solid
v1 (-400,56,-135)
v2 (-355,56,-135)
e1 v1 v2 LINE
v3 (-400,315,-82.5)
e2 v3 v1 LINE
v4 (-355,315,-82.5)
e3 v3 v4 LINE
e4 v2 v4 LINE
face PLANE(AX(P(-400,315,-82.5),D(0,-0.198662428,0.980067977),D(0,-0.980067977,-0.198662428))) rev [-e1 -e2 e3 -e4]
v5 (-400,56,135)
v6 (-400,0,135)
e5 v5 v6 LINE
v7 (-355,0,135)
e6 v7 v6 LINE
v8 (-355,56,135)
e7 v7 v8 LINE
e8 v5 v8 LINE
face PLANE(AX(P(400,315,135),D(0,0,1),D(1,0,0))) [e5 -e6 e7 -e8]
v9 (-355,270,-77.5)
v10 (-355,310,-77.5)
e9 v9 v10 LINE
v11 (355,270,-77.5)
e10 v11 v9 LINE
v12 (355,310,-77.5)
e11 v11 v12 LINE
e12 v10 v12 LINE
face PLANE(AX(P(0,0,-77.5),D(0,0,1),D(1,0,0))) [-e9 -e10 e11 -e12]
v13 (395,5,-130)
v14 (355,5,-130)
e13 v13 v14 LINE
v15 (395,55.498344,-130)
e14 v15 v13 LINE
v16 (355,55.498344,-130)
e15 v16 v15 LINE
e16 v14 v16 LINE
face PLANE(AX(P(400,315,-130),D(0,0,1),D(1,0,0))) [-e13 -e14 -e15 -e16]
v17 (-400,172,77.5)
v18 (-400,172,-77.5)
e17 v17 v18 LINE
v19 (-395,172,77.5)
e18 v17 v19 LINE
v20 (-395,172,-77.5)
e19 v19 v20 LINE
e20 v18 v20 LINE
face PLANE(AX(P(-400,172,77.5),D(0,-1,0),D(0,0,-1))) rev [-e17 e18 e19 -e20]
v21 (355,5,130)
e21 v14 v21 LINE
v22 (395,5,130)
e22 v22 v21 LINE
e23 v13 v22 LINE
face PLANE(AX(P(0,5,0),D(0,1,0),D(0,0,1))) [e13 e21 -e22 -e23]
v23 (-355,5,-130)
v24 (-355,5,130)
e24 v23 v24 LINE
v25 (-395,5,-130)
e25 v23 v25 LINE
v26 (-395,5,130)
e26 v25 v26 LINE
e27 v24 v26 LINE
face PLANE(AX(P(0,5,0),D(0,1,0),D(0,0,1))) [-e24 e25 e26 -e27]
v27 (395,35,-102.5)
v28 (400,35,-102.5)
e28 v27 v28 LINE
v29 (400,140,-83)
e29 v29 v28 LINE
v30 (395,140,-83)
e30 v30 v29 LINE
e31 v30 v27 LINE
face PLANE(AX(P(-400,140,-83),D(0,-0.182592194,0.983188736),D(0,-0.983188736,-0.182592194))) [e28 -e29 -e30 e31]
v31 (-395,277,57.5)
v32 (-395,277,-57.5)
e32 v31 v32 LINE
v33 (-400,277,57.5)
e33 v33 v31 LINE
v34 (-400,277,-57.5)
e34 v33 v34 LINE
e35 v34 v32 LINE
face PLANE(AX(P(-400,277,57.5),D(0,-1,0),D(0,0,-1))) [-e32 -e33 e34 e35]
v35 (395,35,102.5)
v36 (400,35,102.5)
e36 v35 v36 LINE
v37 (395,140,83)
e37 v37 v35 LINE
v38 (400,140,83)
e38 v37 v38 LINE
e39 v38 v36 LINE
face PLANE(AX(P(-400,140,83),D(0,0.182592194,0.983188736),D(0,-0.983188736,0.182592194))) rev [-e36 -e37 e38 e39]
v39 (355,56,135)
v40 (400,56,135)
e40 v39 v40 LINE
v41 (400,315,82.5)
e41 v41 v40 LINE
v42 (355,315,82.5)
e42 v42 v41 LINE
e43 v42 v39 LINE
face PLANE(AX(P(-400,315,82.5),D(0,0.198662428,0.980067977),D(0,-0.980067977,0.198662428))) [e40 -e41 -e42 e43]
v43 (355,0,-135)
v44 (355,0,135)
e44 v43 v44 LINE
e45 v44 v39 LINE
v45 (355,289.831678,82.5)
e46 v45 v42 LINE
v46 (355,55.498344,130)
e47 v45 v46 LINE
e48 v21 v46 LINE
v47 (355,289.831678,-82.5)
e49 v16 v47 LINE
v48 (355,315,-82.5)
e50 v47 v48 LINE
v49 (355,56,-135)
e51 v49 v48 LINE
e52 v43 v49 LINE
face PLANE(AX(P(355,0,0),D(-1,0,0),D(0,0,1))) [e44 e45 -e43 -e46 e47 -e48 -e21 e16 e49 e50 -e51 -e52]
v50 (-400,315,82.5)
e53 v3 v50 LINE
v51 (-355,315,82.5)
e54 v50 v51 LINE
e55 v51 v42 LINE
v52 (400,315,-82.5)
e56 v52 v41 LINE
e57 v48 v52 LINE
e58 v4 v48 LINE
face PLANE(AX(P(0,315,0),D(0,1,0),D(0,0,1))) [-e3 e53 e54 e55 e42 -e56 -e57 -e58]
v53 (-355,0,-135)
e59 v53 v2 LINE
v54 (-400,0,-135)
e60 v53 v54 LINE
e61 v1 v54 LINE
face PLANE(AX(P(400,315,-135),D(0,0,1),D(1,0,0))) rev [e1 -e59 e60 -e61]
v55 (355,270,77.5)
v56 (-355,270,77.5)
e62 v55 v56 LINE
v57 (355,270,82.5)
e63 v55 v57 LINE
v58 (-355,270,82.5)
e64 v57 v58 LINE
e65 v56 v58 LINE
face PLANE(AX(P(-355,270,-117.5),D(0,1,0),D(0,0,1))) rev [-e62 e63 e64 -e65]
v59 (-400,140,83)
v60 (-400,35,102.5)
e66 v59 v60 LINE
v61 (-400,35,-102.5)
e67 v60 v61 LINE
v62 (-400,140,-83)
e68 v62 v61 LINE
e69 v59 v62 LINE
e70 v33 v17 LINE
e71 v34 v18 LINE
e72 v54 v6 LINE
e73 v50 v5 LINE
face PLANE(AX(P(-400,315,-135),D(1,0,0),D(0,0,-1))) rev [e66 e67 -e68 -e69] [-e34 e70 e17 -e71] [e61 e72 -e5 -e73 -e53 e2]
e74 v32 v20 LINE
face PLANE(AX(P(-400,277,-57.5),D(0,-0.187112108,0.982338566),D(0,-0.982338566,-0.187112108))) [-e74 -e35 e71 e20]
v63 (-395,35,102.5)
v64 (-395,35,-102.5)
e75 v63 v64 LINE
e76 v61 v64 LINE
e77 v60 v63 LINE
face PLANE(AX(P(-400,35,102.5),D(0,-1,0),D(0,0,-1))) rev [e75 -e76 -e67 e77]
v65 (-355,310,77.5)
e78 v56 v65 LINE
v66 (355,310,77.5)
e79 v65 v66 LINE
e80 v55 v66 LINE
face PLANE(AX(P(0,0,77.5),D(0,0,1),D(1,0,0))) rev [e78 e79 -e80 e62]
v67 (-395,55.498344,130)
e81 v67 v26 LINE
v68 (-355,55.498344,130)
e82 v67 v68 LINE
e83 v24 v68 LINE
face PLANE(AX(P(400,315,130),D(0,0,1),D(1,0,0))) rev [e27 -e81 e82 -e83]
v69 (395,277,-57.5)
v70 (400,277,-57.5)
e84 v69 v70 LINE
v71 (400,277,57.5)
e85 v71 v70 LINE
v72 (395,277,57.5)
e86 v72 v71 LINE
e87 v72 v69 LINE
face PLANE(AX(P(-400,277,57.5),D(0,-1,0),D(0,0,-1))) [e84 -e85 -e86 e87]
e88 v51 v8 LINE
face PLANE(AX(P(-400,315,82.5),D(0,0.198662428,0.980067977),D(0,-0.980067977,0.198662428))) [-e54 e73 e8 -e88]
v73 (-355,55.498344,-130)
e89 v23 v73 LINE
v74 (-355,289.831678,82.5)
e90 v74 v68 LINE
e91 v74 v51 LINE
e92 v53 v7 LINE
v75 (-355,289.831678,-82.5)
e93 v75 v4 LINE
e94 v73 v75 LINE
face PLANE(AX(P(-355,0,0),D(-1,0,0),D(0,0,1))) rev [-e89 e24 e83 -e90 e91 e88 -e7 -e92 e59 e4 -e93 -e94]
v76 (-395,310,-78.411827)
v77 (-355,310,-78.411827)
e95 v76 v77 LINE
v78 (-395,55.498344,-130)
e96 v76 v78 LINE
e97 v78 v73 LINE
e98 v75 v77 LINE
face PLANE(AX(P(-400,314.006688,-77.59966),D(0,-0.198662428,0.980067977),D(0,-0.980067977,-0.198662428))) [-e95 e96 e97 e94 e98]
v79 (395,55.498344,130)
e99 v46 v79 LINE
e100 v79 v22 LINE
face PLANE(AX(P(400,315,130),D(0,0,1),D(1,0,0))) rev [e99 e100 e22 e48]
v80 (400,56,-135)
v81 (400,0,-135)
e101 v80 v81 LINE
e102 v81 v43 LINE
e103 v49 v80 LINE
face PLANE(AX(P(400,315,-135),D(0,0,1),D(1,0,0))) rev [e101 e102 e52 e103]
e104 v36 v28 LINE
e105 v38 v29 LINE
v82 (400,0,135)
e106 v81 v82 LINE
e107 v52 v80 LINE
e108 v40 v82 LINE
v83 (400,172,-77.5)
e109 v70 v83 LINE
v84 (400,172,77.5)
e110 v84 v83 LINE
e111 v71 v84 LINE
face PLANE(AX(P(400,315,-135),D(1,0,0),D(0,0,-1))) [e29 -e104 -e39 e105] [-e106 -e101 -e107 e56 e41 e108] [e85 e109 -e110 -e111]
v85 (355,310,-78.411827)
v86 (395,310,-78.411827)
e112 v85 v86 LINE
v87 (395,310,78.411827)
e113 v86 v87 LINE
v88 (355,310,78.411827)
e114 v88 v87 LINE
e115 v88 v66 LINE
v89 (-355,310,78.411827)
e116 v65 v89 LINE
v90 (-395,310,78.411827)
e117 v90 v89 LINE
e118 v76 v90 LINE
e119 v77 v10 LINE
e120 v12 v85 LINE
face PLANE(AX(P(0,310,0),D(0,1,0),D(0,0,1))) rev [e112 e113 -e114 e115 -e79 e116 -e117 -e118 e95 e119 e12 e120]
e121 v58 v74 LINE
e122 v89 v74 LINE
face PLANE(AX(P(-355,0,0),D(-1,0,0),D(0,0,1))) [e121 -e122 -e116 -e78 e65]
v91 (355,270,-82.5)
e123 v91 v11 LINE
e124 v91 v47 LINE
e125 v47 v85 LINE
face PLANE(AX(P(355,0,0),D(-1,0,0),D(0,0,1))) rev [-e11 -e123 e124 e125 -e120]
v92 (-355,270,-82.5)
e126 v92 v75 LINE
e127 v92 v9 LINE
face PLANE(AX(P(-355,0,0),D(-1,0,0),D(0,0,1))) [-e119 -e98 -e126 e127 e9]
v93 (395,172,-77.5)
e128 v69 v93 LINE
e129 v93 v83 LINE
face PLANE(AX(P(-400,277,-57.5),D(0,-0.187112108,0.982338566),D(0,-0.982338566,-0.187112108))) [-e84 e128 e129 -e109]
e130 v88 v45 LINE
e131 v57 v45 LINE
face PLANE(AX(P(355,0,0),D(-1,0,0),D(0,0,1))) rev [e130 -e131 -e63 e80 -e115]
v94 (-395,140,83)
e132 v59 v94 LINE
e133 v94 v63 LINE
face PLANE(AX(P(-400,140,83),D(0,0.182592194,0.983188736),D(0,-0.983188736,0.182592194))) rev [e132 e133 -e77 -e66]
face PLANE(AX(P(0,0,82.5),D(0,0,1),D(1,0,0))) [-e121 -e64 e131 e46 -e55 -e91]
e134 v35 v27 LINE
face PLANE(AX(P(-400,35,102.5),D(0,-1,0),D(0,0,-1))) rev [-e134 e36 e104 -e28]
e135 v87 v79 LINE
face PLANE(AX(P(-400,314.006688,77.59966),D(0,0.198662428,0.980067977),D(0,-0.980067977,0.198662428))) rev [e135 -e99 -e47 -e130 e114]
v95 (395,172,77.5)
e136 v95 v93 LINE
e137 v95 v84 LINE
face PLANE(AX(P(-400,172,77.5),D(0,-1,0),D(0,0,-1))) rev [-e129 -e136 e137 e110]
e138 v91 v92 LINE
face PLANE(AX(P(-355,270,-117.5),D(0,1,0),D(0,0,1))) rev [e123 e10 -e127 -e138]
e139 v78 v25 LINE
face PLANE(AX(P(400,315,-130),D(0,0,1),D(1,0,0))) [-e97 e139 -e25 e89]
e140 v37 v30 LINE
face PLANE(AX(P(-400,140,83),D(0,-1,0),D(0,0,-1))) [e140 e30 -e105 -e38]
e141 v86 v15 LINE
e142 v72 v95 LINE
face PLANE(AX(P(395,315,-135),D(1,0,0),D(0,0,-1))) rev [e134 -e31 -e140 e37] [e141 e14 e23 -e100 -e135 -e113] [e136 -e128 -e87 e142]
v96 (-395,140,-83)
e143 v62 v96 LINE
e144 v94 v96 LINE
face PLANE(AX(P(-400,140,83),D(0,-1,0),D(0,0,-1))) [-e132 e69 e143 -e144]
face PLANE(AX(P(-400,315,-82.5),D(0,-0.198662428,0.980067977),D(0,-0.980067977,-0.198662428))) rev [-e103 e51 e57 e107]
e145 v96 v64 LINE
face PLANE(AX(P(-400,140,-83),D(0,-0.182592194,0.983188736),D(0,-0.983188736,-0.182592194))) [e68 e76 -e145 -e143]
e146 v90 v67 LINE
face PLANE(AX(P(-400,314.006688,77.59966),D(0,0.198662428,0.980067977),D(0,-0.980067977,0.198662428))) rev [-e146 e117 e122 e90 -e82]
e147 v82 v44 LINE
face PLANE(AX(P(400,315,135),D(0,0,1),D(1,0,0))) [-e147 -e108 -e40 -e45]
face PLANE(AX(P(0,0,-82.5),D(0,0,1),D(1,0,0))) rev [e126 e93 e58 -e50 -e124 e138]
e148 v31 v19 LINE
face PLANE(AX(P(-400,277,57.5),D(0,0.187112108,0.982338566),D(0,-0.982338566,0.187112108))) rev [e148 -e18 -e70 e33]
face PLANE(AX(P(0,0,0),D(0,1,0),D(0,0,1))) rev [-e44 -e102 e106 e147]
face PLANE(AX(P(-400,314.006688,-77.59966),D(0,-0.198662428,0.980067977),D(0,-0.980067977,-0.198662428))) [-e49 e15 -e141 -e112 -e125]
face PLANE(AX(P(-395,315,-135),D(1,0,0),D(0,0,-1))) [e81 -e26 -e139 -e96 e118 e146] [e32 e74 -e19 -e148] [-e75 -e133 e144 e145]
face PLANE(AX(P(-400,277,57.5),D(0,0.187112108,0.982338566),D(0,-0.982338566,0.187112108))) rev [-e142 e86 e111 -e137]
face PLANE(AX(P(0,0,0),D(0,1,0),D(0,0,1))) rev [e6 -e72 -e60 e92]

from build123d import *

# Parameters (mm, degrees)
CROQUIS1_W              = 800
CROQUIS1_H              = 270
SALIENTE_EXTRUIR1_DEPTH = 315
CROQUIS2_W              = 710
CROQUIS2_H              = 52.5
CORTAR_EXTRUIR2_DEPTH   = 315
CORTAR_EXTRUIR6_DEPTH   = 800
CROQUIS8_W              = 710
CROQUIS8_H              = 270
CORTAR_EXTRUIR7_DEPTH   = 200
VACIADO5_START          = -395
VACIADO5_OUTLINE_W      = 40
VACIADO5_OUTLINE_H      = 155
VACIADO5_DEPTH          = 790
VACIADO5_2_DEPTH        = 40
VACIADO5_START_2        = 355
VACIADO5_3_DEPTH        = 40
CORTAR_EXTRUIR8_DEPTH   = 800


# Read off the part's stored shape, not the designer's step: Vaciado5
with BuildPart() as part:
    # Croquis1 → Saliente-Extruir1 (new body)
    with BuildSketch(Plane(origin=(0, 0, 0), x_dir=(1, 0, 0), z_dir=(0, 1, 0))):
        Rectangle(CROQUIS1_W, CROQUIS1_H)
    extrude(amount=SALIENTE_EXTRUIR1_DEPTH)

    # Croquis2 → Cortar-Extruir2 (cut)
    with BuildSketch(Plane(origin=(0, 315, 0), x_dir=(1, 0, 0), z_dir=(0, 1, 0))):
        with Locations((0, 108.75)):
            Rectangle(CROQUIS2_W, CROQUIS2_H)
        with Locations((0, -108.75)):
            Rectangle(CROQUIS2_W, CROQUIS2_H)
    extrude(amount=-CORTAR_EXTRUIR2_DEPTH, mode=Mode.SUBTRACT)

    # Croquis4 → Cortar-Extruir6 (cut)
    with BuildSketch(Plane(origin=(400, 0, 0), x_dir=(0, 0, -1), z_dir=(1, 0, 0))):
        Polygon((135, 315), (82.5, 315), (135, 56), align=None)
        Polygon((-135, 315), (-82.5, 315), (-135, 56), align=None)
    extrude(amount=-CORTAR_EXTRUIR6_DEPTH, mode=Mode.SUBTRACT)

    # Croquis8 → Cortar-Extruir7 (cut)
    with BuildSketch(Plane.XY.offset(82.5)):
        with Locations((0, 135)):
            Rectangle(CROQUIS8_W, CROQUIS8_H)
    extrude(amount=-CORTAR_EXTRUIR7_DEPTH, mode=Mode.SUBTRACT)

    # Vaciado5 outline → Vaciado5 (cut)
    with BuildSketch(Plane.YZ.offset(VACIADO5_START)):
        with Locations((290, 0)):
            Rectangle(VACIADO5_OUTLINE_W, VACIADO5_OUTLINE_H)
    extrude(amount=VACIADO5_DEPTH, mode=Mode.SUBTRACT)

    # Vaciado5 2 outline → Vaciado5 2 (cut)
    with BuildSketch(Plane.YZ.offset(VACIADO5_START)):
        Polygon((5, 130), (5, -130), (55.498344425, -130), (310, -78.411826573), (310, -77.5), (270, -77.5), (270, 77.5), (310, 77.5), (310, 78.411826573), (55.498344425, 130), align=None)
    extrude(amount=VACIADO5_2_DEPTH, mode=Mode.SUBTRACT)

    # Vaciado5 3 outline → Vaciado5 3 (cut)
    with BuildSketch(Plane.YZ.offset(VACIADO5_START_2)):
        Polygon((5, 130), (5, -130), (55.498344425, -130), (310, -78.411826573), (310, -77.5), (270, -77.5), (270, 77.5), (310, 77.5), (310, 78.411826573), (55.498344425, 130), align=None)
    extrude(amount=VACIADO5_3_DEPTH, mode=Mode.SUBTRACT)

    # Croquis9 → Cortar-Extruir8 (cut)
    with BuildSketch(Plane(origin=(400, 0, 0), x_dir=(0, 0, -1), z_dir=(1, 0, 0))):
        Polygon((-102.5, 35), (102.5, 35), (83, 140), (-83, 140), align=None)
        Polygon((-77.5, 172), (77.5, 172), (57.5, 277), (-57.5, 277), align=None)
    extrude(amount=-CORTAR_EXTRUIR8_DEPTH, mode=Mode.SUBTRACT)


solid = part.part
